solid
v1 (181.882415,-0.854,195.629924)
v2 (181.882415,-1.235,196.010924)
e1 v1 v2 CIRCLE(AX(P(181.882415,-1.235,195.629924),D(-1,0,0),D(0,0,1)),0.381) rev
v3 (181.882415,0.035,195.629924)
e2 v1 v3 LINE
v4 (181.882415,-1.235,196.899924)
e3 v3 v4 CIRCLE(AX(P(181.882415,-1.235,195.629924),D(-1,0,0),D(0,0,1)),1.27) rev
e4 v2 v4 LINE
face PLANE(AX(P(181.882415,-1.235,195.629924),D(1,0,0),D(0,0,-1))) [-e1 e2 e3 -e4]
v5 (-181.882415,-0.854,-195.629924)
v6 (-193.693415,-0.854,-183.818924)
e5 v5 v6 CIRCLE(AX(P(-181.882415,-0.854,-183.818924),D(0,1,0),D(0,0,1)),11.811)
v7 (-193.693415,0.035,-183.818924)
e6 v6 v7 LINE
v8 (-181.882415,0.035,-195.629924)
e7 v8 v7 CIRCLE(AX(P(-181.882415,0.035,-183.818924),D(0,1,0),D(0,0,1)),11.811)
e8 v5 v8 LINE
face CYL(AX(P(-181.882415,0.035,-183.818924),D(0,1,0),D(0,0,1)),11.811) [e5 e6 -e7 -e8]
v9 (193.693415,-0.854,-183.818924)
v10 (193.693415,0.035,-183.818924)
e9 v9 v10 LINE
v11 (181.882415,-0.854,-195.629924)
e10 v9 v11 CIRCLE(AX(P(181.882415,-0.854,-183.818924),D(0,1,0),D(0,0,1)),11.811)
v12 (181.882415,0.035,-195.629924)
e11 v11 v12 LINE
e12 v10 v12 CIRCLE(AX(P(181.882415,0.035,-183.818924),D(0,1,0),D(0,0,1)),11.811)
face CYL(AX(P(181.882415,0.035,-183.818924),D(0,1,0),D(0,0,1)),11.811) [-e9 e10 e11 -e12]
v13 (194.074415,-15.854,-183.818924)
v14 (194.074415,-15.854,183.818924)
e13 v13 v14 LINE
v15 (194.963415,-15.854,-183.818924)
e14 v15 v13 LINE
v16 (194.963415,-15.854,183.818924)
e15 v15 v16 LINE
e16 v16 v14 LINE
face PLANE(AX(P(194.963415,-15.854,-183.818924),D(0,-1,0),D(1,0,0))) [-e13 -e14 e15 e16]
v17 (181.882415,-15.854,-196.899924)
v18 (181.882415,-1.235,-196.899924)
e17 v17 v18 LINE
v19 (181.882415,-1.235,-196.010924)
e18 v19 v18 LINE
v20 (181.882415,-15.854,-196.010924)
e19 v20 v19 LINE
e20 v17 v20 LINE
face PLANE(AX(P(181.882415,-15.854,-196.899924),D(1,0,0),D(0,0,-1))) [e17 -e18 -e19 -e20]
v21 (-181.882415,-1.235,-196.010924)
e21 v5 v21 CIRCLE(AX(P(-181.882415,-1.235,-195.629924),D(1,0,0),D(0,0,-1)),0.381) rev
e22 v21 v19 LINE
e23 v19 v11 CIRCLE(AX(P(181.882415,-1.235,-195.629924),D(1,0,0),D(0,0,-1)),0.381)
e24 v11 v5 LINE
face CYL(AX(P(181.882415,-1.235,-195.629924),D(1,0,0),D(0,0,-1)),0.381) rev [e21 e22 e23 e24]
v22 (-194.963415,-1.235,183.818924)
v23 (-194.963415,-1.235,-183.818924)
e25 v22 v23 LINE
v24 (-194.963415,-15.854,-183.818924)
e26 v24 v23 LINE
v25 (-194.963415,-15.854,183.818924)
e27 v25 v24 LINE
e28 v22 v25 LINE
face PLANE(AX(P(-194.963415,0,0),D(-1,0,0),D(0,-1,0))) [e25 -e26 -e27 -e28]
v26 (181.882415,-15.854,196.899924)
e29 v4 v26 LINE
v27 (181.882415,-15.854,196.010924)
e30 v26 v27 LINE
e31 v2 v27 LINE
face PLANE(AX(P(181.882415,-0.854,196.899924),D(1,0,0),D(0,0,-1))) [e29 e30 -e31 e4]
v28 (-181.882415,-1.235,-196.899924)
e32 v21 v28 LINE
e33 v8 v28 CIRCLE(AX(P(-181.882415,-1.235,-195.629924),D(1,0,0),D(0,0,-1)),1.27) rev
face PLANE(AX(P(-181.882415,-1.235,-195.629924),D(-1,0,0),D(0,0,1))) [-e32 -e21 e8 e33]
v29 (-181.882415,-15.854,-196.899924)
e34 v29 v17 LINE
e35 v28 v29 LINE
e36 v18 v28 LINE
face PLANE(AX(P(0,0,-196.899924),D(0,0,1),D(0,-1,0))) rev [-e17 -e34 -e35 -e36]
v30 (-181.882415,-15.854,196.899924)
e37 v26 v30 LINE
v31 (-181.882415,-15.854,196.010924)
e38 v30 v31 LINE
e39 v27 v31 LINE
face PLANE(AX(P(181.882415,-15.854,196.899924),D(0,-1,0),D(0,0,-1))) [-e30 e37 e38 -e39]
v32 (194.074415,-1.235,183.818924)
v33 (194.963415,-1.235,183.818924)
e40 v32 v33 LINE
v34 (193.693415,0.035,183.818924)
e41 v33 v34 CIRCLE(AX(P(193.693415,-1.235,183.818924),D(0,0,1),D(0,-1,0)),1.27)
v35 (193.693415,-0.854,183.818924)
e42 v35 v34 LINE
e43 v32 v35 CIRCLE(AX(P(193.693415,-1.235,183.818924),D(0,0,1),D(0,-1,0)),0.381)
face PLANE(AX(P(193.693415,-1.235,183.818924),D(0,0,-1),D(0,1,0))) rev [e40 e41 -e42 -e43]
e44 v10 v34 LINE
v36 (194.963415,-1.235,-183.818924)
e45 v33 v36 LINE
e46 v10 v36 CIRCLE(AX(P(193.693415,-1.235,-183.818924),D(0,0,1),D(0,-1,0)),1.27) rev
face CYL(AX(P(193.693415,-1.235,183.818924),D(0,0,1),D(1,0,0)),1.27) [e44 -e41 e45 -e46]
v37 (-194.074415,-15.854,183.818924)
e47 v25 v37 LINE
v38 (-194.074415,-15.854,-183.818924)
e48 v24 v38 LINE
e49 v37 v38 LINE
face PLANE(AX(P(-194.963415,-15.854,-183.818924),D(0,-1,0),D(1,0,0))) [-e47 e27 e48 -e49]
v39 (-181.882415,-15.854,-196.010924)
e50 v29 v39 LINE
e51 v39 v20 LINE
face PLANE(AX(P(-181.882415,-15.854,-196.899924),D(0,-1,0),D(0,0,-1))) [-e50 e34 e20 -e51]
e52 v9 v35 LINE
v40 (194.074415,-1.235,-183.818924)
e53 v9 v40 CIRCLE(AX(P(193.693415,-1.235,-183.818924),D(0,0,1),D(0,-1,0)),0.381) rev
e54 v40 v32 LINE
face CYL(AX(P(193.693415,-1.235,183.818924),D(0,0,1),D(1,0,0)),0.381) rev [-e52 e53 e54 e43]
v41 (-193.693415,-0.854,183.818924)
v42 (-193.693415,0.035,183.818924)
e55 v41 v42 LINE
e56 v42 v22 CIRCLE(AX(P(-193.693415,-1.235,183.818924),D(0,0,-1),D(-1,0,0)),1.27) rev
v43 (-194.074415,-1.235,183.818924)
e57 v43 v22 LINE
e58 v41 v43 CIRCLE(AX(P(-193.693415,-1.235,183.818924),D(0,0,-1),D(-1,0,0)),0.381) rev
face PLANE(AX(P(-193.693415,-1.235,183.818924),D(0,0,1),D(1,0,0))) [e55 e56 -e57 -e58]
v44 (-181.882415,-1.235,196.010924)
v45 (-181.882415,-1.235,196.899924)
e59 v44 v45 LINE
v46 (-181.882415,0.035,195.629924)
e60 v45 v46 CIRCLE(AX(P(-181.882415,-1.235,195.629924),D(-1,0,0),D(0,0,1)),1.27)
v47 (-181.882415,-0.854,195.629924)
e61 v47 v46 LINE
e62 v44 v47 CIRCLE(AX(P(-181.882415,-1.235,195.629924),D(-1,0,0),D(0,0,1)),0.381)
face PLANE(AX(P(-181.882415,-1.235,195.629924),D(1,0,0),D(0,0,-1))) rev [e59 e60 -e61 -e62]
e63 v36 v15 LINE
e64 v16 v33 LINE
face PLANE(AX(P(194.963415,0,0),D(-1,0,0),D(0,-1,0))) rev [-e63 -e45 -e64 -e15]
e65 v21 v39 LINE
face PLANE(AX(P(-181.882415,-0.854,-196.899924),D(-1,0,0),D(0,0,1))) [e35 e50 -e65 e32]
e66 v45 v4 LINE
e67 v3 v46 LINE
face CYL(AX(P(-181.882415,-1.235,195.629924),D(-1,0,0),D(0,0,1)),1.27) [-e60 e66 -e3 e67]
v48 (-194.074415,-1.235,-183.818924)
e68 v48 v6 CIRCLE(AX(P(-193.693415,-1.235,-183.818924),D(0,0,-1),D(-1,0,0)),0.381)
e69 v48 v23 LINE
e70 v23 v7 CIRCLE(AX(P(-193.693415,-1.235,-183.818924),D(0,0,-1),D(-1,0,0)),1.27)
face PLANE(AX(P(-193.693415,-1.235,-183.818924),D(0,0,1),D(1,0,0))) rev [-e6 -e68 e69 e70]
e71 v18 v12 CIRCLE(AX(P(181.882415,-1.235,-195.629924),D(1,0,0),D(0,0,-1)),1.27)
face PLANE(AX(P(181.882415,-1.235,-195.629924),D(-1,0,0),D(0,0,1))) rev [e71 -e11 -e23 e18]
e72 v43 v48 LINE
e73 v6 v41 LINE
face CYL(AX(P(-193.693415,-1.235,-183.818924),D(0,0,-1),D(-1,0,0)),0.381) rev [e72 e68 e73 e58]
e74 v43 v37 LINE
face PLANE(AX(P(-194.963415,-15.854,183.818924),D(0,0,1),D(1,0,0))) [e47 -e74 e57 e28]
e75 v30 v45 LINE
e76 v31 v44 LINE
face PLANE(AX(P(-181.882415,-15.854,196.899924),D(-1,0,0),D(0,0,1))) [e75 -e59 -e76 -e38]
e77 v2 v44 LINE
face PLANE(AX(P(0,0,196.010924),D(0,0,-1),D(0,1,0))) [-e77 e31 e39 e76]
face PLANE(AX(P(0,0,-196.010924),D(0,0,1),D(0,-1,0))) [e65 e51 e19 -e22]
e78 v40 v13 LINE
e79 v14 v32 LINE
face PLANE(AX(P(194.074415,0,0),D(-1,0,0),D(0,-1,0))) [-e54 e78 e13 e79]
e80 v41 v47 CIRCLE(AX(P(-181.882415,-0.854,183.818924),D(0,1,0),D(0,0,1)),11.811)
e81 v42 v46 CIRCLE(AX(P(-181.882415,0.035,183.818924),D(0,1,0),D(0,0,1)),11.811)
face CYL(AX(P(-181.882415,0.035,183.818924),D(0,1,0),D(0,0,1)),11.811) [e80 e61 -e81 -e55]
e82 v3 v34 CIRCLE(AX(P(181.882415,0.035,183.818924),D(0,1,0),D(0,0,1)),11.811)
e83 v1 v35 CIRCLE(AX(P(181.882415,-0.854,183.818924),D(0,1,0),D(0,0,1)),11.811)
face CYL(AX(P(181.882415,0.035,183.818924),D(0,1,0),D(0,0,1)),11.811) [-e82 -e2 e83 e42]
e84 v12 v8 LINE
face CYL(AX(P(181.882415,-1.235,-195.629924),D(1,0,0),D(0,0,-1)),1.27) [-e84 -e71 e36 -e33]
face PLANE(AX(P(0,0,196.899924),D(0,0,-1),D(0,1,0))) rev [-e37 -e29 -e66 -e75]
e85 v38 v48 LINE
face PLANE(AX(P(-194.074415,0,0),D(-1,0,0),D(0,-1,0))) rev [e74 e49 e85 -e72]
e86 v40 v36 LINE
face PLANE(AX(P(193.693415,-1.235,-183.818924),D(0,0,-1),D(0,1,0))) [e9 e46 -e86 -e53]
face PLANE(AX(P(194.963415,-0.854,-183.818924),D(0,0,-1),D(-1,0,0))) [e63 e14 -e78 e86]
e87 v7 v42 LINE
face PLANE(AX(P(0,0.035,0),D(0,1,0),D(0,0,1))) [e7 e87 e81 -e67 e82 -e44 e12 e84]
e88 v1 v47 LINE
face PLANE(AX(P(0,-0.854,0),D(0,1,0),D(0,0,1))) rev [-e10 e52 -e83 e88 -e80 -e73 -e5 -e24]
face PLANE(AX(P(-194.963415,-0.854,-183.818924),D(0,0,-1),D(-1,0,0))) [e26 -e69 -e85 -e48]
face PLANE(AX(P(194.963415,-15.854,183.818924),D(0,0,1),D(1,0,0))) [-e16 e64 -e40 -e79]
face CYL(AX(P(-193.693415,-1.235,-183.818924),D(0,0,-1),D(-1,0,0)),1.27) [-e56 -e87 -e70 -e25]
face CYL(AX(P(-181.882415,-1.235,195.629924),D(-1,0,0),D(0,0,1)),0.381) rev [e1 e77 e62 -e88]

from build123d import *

# Parameters (mm, degrees)
SKETCH1_W                 = 387.38683
SKETCH1_H                 = 391.2598474
BOSS_EXTRUDE1_DEPTH       = 0.035
FILLET1_R                 = 11.811
CONVERT_SOLID1_START      = -0.854
CONVERT_SOLID1_DEPTH      = 0.854
EDGE_FLANGE1_DEPTH        = 367.6378474
EDGE_FLANGE1_BEND_DEPTH   = 363.76483
EDGE_FLANGE1_BEND_2_DEPTH = 367.6378474
EDGE_FLANGE1_BEND_3_DEPTH = 363.76483


# Read off the part's stored shape, not the designer's step: Convert-Solid1
# Sheet-metal steps are written as plain solids
with BuildPart() as part:
    # Sketch1 → Boss-Extrude1 (new body)
    with BuildSketch(Plane(origin=(0, 0, 0), x_dir=(1, 0, 0), z_dir=(0, 1, 0))):
        Rectangle(SKETCH1_W, SKETCH1_H)
    extrude(amount=BOSS_EXTRUDE1_DEPTH)

    # Fillet1
    fillet1_edges = [part.edges().sort_by_distance(p)[0] for p in [
        (193.693415, 0.0175, -195.6299237),
        (193.693415, 0.0175, 195.6299237),
        (-193.693415, 0.0175, 195.6299237),
        (-193.693415, 0.0175, -195.6299237),
    ]]
    fillet(fillet1_edges, radius=FILLET1_R)

    # Convert-Solid1 outline → Convert-Solid1 (add)
    with BuildSketch(Plane(origin=(0, 0, 0), x_dir=(1, 0, 0), z_dir=(0, 1, 0)).offset(CONVERT_SOLID1_START)):
        with BuildLine():
            ThreePointArc((193.693415, 183.8189237), (190.234053193, 192.170561893), (181.882415, 195.6299237))
            Line((181.882415, 195.6299237), (-181.882415, 195.6299237))
            ThreePointArc((-181.882415, 195.6299237), (-190.234053193, 192.170561893), (-193.693415, 183.8189237))
            Line((-193.693415, 183.8189237), (-193.693415, -183.8189237))
            ThreePointArc((-193.693415, -183.8189237), (-190.234053193, -192.170561893), (-181.882415, -195.6299237))
            Line((-181.882415, -195.6299237), (181.882415, -195.6299237))
            ThreePointArc((181.882415, -195.6299237), (190.234053193, -192.170561893), (193.693415, -183.8189237))
            Line((193.693415, -183.8189237), (193.693415, 183.8189237))
        make_face()
    extrude(amount=CONVERT_SOLID1_DEPTH)

    # Edge-Flange1 section (across the edge) → Edge-Flange1 (add)
    with BuildSketch(Plane(origin=(-194.074415, -0.854, 183.8189237), x_dir=(1, 0, 0), z_dir=(0, 0, -1))):
        with BuildLine():
            Line((-0.889, 0.381), (-0.889, 15))
            Line((-0.889, 15), (0, 15))
            Line((0, 15), (0, 0.381))
            ThreePointArc((0, 0.381), (0.111592316, 0.111592316), (0.381, 0))
            Line((0.381, 0), (0.381, -0.889))
            ThreePointArc((0.381, -0.889), (-0.517025612, -0.517025612), (-0.889, 0.381))
        make_face()
    extrude(amount=EDGE_FLANGE1_DEPTH)

    # Edge-Flange1 section 2 (across the edge) → Edge-Flange1 bend (add)
    with BuildSketch(Plane(origin=(181.882415, -0.854, 196.0109237), x_dir=(0, 0, -1), z_dir=(-1, 0, 0))):
        with BuildLine():
            Line((-0.889, 0.381), (-0.889, 15))
            Line((-0.889, 15), (0, 15))
            Line((0, 15), (0, 0.381))
            ThreePointArc((0, 0.381), (0.111592316, 0.111592316), (0.381, 0))
            Line((0.381, 0), (0.381, -0.889))
            ThreePointArc((0.381, -0.889), (-0.517025612, -0.517025612), (-0.889, 0.381))
        make_face()
    extrude(amount=EDGE_FLANGE1_BEND_DEPTH)

    # Edge-Flange1 section 3 (across the edge) → Edge-Flange1 bend 2 (add)
    with BuildSketch(Plane(origin=(194.074415, -0.854, -183.8189237), x_dir=(-1, 0, 0), z_dir=(0, 0, 1))):
        with BuildLine():
            Line((-0.889, 0.381), (-0.889, 15))
            Line((-0.889, 15), (0, 15))
            Line((0, 15), (0, 0.381))
            ThreePointArc((0, 0.381), (0.111592316, 0.111592316), (0.381, 0))
            Line((0.381, 0), (0.381, -0.889))
            ThreePointArc((0.381, -0.889), (-0.517025612, -0.517025612), (-0.889, 0.381))
        make_face()
    extrude(amount=EDGE_FLANGE1_BEND_2_DEPTH)

    # Edge-Flange1 section 4 (across the edge) → Edge-Flange1 bend 3 (add)
    with BuildSketch(Plane(origin=(-181.882415, -0.854, -196.0109237), x_dir=(0, 0, 1), z_dir=(1, 0, 0))):
        with BuildLine():
            Line((-0.889, 0.381), (-0.889, 15))
            Line((-0.889, 15), (0, 15))
            Line((0, 15), (0, 0.381))
            ThreePointArc((0, 0.381), (0.111592316, 0.111592316), (0.381, 0))
            Line((0.381, 0), (0.381, -0.889))
            ThreePointArc((0.381, -0.889), (-0.517025612, -0.517025612), (-0.889, 0.381))
        make_face()
    extrude(amount=EDGE_FLANGE1_BEND_3_DEPTH)


solid = part.part
